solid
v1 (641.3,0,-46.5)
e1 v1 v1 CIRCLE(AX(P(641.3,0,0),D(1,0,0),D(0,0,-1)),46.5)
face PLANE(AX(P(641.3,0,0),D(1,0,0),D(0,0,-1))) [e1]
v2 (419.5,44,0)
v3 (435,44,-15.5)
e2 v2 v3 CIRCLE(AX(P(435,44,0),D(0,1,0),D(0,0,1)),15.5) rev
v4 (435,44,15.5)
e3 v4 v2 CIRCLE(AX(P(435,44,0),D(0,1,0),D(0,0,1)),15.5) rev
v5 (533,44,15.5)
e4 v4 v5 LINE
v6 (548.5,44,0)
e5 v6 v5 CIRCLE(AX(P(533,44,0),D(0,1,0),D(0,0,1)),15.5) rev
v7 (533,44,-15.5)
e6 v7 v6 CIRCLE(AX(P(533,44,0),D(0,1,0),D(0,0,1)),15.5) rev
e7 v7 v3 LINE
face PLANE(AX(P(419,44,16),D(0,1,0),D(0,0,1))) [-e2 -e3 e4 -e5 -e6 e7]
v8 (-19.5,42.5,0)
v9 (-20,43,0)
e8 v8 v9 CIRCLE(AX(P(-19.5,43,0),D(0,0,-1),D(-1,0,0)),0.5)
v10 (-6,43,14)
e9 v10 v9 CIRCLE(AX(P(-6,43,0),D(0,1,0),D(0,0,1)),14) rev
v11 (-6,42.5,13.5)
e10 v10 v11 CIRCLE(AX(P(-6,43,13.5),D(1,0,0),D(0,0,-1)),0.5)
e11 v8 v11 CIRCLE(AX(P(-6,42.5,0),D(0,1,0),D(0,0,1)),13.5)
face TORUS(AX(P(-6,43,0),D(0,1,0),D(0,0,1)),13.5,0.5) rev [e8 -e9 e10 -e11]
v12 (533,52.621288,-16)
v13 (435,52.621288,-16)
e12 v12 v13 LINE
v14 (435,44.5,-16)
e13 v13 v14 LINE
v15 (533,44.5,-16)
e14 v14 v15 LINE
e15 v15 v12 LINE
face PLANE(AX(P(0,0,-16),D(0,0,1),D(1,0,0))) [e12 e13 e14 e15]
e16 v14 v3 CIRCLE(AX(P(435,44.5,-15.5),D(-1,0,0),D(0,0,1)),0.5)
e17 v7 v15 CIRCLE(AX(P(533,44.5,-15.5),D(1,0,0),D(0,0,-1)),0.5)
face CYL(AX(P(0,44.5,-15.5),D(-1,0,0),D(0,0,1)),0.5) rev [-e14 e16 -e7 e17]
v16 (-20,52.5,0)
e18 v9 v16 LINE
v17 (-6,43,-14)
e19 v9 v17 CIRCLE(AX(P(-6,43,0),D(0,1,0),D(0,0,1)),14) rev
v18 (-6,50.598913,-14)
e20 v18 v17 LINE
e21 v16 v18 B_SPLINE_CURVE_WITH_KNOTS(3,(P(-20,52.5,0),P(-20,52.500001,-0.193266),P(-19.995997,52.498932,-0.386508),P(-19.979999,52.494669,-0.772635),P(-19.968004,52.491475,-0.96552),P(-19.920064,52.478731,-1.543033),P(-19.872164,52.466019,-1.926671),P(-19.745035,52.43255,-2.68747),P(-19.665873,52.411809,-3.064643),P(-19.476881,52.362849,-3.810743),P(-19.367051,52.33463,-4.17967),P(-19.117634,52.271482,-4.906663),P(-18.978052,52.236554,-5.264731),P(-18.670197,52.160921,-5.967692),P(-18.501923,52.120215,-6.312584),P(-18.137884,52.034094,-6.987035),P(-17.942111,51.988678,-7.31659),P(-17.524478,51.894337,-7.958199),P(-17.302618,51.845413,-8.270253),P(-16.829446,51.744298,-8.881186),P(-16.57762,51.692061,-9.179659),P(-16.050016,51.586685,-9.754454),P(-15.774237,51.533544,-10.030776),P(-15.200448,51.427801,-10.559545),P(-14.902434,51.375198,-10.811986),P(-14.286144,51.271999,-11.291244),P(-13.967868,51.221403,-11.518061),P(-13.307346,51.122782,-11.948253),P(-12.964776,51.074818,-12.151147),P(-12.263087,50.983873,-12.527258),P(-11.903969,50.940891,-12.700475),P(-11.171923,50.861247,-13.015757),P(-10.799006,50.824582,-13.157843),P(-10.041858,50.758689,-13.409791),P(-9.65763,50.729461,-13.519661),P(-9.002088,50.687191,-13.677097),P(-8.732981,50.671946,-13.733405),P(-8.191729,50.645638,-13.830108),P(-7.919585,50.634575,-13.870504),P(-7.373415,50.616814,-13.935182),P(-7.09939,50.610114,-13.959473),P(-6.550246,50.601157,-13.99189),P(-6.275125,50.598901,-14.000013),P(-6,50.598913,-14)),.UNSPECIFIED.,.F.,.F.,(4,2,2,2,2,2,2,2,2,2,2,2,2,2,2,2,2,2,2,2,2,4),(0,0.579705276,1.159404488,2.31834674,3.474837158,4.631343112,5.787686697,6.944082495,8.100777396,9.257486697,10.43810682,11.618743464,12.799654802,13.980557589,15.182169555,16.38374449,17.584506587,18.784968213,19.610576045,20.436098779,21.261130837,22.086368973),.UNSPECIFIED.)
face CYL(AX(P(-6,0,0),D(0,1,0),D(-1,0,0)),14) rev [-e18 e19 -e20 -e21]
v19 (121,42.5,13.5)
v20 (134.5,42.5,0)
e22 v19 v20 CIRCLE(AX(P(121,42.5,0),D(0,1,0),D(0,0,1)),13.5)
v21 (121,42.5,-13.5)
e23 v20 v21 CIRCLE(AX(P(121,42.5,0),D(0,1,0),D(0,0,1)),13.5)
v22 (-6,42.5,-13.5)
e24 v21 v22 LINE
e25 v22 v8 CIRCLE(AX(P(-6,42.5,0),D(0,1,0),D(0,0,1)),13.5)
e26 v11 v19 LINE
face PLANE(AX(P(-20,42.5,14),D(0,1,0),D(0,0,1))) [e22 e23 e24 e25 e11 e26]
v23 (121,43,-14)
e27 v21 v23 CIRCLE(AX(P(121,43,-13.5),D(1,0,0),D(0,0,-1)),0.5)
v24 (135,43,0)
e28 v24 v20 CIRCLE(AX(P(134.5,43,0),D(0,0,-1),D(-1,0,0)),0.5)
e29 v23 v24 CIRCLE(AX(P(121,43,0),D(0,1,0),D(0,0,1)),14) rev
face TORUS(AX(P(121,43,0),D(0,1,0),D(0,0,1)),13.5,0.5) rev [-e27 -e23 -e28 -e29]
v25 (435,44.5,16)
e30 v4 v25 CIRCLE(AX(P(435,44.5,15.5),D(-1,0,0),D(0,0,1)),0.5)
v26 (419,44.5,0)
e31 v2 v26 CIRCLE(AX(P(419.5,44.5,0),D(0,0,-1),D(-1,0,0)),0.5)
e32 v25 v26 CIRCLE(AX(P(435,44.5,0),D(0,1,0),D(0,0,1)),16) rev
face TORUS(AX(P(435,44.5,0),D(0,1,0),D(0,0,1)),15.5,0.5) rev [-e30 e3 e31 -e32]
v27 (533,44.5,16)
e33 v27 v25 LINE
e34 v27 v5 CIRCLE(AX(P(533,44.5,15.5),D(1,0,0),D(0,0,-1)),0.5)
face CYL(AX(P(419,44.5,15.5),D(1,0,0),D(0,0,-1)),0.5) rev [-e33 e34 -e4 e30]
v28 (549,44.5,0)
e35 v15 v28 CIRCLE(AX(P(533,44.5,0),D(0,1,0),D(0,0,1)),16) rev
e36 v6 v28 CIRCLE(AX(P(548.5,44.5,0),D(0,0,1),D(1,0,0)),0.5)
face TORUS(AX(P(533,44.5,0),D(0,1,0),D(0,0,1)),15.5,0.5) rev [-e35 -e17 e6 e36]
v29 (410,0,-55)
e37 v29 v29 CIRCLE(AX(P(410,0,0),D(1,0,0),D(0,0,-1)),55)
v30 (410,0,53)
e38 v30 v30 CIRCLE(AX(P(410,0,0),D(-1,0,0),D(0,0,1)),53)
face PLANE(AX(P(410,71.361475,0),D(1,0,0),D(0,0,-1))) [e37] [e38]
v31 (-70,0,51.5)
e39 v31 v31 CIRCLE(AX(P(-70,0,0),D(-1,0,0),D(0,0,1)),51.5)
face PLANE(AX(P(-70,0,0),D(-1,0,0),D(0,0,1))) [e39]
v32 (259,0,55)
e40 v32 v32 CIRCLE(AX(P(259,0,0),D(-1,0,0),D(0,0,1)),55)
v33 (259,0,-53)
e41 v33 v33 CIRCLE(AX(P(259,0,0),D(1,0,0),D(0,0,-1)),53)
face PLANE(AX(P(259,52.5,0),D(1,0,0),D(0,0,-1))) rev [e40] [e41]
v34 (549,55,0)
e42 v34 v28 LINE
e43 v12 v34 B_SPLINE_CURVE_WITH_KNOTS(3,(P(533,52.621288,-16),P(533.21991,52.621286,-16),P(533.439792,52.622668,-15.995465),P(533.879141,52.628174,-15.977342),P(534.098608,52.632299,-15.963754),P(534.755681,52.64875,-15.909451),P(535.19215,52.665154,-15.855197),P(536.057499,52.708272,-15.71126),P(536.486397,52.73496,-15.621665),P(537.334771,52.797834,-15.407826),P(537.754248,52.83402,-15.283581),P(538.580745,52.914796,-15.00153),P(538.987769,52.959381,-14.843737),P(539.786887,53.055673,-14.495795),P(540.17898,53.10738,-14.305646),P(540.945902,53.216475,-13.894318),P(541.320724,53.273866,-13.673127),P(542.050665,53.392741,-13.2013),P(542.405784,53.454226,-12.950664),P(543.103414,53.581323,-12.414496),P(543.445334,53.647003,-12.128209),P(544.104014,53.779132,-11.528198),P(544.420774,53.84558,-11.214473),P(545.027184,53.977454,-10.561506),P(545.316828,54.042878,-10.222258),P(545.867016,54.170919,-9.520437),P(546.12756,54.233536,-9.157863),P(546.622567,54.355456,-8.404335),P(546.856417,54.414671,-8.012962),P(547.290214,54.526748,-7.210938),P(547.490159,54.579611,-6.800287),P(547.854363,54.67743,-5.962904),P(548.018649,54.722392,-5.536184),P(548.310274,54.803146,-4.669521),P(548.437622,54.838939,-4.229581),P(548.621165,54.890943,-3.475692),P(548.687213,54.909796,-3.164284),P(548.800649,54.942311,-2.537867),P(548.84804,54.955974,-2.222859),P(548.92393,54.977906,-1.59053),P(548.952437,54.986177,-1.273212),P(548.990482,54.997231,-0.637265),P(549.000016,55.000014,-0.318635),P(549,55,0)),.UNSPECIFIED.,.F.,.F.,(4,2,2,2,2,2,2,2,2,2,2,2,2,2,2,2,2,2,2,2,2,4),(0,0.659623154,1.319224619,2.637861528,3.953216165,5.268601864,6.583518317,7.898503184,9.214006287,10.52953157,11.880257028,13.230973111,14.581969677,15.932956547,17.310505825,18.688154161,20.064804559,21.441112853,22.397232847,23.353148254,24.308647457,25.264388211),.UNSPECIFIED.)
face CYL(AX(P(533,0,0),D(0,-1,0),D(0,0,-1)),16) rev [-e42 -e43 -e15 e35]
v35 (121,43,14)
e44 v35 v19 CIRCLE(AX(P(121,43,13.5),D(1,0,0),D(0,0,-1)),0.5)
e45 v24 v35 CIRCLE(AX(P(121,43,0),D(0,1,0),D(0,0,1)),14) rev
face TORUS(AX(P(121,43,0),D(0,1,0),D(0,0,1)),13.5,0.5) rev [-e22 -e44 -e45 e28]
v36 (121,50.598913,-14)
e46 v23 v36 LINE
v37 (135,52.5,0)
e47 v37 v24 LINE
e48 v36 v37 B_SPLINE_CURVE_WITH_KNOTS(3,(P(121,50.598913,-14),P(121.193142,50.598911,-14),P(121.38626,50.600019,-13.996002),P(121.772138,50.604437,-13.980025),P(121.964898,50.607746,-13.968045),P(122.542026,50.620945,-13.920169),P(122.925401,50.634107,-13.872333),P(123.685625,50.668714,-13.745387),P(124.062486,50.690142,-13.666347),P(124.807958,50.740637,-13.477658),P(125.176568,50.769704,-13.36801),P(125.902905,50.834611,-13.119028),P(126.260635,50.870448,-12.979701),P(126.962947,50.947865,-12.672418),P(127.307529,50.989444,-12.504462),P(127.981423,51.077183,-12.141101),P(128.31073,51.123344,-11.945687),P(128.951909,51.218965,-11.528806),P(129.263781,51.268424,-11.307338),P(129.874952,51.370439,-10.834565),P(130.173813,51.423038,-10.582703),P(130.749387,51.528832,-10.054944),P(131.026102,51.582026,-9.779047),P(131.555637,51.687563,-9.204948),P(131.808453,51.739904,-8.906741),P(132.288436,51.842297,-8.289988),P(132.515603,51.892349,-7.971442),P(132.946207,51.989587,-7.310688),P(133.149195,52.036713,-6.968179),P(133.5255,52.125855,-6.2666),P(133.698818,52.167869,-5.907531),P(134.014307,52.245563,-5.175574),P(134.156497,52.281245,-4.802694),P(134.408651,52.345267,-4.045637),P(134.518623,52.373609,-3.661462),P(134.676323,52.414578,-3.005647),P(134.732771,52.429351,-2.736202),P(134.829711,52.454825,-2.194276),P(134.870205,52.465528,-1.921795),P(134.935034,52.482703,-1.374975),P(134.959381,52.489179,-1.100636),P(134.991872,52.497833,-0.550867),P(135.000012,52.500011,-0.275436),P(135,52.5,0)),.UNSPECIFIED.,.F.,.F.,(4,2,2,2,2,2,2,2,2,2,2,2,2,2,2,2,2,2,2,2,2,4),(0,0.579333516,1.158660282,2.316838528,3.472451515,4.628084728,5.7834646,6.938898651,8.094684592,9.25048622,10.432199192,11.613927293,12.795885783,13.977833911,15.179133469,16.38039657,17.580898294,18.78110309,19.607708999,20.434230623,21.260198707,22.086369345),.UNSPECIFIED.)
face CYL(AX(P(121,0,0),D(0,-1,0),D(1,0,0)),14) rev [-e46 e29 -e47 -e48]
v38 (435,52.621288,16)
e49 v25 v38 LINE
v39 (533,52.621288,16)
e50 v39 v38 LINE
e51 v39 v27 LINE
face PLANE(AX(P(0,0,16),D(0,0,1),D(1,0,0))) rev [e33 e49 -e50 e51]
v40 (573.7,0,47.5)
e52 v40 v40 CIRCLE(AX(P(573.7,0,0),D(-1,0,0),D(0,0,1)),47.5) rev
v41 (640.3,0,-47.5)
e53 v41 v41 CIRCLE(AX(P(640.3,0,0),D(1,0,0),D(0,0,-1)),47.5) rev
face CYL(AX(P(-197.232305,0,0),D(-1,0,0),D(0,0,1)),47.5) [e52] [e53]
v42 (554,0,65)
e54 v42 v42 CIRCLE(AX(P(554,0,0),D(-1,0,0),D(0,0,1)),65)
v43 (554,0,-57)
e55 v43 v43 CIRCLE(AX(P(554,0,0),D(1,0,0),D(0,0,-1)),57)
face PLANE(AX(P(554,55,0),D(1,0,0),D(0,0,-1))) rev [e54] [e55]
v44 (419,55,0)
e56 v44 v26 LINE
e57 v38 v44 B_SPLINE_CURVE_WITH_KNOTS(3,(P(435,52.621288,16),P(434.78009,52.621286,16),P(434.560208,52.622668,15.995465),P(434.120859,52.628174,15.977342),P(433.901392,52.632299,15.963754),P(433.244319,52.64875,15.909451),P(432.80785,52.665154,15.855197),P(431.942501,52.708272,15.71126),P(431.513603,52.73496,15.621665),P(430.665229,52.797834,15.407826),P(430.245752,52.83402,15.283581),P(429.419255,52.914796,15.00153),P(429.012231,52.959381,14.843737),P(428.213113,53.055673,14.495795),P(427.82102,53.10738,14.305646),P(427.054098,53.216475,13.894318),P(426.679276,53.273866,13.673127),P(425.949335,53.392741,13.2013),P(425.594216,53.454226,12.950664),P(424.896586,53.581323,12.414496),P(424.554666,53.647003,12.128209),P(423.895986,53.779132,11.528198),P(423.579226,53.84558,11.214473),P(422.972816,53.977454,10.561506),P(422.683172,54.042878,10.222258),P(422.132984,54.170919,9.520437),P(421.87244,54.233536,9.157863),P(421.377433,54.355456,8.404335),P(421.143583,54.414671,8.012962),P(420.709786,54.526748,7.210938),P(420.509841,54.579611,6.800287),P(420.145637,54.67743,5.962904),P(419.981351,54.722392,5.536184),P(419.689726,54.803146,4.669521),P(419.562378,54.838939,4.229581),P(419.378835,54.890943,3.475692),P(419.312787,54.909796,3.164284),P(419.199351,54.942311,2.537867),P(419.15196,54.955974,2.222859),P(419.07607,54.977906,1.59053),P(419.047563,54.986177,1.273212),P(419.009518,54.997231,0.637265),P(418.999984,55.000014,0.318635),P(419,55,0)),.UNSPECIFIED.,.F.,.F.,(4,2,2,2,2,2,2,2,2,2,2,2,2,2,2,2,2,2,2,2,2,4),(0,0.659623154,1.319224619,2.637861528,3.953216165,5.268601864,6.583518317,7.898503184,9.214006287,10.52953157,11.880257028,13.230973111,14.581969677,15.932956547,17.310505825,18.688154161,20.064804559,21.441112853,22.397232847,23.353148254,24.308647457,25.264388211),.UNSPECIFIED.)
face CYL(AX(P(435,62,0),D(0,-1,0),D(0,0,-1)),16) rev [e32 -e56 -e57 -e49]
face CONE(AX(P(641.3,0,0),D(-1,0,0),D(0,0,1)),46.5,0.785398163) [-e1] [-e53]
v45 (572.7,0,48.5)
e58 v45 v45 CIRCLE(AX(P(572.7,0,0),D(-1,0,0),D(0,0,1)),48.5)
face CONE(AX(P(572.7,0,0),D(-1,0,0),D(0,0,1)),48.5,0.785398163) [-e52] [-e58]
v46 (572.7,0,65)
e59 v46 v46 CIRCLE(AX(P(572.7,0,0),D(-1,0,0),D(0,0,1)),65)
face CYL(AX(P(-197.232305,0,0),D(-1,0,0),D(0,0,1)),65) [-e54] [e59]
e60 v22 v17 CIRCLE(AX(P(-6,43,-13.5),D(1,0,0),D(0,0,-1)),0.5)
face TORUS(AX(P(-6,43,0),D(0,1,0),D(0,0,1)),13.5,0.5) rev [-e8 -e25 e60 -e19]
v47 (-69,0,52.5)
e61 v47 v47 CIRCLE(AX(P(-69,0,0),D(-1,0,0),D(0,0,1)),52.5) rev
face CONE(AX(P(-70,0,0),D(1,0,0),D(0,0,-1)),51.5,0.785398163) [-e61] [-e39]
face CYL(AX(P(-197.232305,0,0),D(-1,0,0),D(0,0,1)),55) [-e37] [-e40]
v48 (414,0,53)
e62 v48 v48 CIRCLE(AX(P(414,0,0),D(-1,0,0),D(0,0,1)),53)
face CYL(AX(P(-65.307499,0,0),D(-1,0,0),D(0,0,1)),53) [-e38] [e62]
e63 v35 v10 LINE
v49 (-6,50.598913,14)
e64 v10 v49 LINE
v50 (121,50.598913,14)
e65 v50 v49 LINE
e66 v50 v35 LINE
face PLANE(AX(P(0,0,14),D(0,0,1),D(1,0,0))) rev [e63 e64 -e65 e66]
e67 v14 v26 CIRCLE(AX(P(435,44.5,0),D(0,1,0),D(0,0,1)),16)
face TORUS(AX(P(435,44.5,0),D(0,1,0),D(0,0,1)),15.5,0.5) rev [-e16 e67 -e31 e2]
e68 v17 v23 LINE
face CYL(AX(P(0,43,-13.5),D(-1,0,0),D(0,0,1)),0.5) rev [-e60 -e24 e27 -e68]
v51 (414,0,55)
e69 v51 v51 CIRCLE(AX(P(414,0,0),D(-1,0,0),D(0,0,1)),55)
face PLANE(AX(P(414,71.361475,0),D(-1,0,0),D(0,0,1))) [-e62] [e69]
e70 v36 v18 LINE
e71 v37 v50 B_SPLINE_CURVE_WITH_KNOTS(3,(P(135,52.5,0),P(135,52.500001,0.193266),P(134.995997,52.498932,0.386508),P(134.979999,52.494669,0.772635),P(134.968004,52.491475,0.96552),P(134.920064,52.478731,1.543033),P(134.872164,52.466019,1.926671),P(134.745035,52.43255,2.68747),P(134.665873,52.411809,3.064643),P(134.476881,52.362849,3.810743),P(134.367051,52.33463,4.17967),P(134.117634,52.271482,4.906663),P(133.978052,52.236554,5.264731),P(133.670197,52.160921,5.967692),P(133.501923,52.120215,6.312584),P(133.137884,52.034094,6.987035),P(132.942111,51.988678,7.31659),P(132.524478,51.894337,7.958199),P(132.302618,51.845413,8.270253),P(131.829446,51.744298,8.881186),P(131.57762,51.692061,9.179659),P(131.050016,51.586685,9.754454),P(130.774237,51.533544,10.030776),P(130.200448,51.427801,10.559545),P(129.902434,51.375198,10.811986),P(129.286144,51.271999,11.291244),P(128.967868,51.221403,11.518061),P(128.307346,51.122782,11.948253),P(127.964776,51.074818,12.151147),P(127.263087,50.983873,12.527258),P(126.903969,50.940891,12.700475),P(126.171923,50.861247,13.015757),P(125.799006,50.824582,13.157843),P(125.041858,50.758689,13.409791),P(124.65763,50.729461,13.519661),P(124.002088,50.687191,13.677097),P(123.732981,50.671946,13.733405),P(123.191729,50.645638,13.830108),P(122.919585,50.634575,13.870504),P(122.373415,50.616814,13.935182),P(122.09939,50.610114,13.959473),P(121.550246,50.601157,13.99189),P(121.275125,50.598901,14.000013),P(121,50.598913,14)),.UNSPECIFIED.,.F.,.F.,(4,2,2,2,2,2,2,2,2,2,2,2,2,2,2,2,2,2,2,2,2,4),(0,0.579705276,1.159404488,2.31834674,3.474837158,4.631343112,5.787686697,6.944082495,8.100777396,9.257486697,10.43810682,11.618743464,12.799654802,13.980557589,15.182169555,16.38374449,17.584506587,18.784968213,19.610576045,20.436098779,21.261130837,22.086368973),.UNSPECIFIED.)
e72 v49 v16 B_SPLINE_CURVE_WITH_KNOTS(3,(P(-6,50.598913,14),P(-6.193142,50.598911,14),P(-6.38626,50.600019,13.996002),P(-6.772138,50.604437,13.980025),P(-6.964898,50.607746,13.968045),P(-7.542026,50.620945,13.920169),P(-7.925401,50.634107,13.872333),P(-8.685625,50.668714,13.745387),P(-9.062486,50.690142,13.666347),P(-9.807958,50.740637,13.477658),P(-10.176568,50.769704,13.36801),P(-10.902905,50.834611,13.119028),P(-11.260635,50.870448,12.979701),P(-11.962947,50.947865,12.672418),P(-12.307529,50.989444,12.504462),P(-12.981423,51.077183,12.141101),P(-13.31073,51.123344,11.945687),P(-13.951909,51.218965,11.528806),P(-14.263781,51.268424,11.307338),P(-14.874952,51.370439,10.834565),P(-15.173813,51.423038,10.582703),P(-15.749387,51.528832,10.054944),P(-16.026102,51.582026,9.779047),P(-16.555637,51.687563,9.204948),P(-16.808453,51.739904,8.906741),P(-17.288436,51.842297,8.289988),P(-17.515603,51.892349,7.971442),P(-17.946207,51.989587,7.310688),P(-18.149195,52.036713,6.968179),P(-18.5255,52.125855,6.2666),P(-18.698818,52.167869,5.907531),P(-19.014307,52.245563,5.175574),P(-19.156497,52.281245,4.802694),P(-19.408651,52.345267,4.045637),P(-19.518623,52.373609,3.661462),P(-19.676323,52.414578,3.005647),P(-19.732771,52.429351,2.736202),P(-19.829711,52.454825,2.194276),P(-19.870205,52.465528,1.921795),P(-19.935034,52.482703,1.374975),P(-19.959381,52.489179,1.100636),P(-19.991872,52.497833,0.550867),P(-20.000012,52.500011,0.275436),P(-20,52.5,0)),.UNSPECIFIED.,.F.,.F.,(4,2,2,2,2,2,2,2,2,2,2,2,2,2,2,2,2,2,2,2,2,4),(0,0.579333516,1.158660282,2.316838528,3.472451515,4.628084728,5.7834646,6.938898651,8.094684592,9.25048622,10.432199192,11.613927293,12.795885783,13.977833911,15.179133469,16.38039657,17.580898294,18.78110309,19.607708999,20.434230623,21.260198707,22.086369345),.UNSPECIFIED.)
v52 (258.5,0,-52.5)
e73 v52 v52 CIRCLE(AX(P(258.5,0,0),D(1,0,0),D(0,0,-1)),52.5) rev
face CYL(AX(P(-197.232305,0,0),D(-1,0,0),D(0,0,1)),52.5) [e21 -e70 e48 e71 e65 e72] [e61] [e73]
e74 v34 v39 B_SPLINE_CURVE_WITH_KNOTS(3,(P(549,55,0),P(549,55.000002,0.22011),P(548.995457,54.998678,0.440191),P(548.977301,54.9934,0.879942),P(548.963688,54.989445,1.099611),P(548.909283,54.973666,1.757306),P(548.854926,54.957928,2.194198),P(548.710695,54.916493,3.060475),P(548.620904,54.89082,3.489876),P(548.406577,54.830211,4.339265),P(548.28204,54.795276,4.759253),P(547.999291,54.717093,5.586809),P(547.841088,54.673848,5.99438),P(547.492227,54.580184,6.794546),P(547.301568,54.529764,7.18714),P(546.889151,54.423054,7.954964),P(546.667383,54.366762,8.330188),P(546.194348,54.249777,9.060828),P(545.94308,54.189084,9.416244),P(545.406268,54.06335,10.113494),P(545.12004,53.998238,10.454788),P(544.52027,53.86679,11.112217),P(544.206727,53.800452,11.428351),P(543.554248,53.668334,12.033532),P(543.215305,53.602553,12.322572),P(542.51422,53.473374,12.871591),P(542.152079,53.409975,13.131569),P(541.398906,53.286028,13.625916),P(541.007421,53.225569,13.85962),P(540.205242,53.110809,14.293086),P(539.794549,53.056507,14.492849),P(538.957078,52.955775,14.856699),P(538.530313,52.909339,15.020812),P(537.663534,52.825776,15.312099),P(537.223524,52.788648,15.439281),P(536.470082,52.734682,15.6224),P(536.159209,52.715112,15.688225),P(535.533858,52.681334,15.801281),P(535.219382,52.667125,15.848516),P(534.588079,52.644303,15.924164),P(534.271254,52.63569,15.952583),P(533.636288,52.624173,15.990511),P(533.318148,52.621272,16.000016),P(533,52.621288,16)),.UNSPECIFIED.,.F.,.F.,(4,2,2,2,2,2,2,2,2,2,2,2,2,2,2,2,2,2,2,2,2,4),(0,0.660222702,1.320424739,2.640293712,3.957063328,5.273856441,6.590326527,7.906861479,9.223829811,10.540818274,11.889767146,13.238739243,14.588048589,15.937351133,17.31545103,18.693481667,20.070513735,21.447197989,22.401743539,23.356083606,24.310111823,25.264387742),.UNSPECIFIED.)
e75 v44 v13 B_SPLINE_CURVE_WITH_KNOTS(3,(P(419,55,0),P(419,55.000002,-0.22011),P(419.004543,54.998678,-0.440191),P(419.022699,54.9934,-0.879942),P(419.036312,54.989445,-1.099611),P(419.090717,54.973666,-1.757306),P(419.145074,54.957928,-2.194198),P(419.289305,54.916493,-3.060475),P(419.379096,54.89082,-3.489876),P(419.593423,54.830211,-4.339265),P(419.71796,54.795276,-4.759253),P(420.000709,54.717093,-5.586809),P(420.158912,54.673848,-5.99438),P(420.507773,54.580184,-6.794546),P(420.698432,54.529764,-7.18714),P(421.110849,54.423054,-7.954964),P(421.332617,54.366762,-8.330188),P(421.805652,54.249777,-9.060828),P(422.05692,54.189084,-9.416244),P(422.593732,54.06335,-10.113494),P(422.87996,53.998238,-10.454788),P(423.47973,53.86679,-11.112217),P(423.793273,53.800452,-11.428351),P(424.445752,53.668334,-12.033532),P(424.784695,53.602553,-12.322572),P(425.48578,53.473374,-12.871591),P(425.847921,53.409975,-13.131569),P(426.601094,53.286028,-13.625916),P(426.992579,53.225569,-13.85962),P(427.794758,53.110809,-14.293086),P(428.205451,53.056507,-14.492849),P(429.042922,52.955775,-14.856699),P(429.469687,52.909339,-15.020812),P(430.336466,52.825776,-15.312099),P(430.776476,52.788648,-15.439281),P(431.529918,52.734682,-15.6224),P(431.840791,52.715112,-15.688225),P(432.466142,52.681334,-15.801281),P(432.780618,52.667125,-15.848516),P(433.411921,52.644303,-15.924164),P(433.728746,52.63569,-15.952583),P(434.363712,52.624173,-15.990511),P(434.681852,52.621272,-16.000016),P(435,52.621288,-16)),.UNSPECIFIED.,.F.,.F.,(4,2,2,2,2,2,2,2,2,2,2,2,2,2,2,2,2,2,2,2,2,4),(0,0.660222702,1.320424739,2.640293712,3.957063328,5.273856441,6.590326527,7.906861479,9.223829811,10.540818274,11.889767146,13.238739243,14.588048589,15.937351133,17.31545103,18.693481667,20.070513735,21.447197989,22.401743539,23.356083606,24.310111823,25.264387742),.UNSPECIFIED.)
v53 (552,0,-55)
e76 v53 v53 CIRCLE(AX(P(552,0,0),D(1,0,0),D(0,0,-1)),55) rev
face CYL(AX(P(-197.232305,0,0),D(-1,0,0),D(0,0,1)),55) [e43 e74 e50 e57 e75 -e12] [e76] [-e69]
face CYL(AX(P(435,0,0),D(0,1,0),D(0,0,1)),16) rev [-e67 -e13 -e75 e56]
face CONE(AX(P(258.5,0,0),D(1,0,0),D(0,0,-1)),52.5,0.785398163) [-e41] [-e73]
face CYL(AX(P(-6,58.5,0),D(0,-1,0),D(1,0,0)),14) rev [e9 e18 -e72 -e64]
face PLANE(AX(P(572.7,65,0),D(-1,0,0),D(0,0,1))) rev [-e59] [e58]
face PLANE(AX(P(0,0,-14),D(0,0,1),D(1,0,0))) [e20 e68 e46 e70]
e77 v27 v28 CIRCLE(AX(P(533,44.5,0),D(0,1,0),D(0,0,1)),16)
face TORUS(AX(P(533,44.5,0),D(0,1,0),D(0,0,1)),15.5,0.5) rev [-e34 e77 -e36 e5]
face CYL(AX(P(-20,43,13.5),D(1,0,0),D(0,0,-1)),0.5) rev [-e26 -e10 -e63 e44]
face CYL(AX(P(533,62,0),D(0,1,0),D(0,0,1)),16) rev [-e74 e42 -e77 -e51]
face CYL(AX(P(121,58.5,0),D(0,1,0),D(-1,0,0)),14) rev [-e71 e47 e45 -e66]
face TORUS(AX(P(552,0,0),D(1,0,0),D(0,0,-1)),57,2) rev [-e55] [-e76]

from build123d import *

# Parameters (mm, degrees)
SMUSSO1_SIZE                  = 0.5
SMUSSO2_SIZE                  = 1
TAGLIO_ESTRUSIONE1_DEPTH      = 16
TAGLIO_ESTRUSIONE1_DEPTH_BACK = 16
SCHIZZO2_W                    = 130
SCHIZZO2_H                    = 18
RACCORDO1_R                   = 0.5
RACCORDO2_R                   = 16
RACCORDO3_R                   = 2
SCHIZZO3_W                    = 4
SCHIZZO3_H                    = 18.361474643
SCHIZZO6_R                    = 52.5
ESTRUSIONE_ESTRUSIONE1_DEPTH  = 70
TAGLIO_ESTRUSIONE2_DEPTH      = 14
TAGLIO_ESTRUSIONE2_DEPTH_BACK = 14
SCHIZZO4_W                    = 155
SCHIZZO4_H                    = 16
RACCORDO4_R                   = 14
RACCORDO5_R                   = 0.5
ESTRUSIONE_ESTRUSIONE2_START  = 13
SCHIZZO7_R                    = 47.5
ESTRUSIONE_ESTRUSIONE2_DEPTH  = 13
SMUSSO3_SIZE                  = 1


with BuildPart() as part:
    # Schizzo1 → Rivoluzione1 (revolve)
    with BuildSketch(Plane.XY, mode=Mode.PRIVATE) as rivoluzione1_sk:
        Polygon((0, 0), (0, 52.5), (259, 52.5), (259, 55), (554, 55), (554, 65), (572.7, 65), (572.7, 47.5), (628.3, 47.5), (628.3, 0), align=None)
    revolve(rivoluzione1_sk.sketch.rotate(Axis((-197.2323049, 0, 0), (1, 0, 0)), 90), axis=Axis((-197.2323049, 0, 0), (1, 0, 0)))

    # Smusso1
    smusso1_edges = [part.edges().sort_by_distance(p)[0] for p in [
        (259, 0, -52.5),
    ]]
    chamfer(smusso1_edges, length=SMUSSO1_SIZE)

    # Smusso2
    smusso2_edges = [part.edges().sort_by_distance(p)[0] for p in [
        (572.7, 0, -47.5),
    ]]
    chamfer(smusso2_edges, length=SMUSSO2_SIZE)

    # Schizzo2 → Taglio-Estrusione1 (cut, two sides: drawn at the far end of the back side and taken through both)
    with BuildSketch(Plane.XY.offset(-TAGLIO_ESTRUSIONE1_DEPTH_BACK)):
        with Locations((484, 53)):
            Rectangle(SCHIZZO2_W, SCHIZZO2_H)
    extrude(amount=TAGLIO_ESTRUSIONE1_DEPTH + TAGLIO_ESTRUSIONE1_DEPTH_BACK, mode=Mode.SUBTRACT)

    # Raccordo1
    raccordo1_edges = [part.edges().sort_by_distance(p)[0] for p in [
        (549, 44, 0),
        (484, 44, 16),
        (419, 44, 0),
        (484, 44, -16),
    ]]
    fillet(raccordo1_edges, radius=RACCORDO1_R)

    # Raccordo2
    # the kernel refuses this fillet: 16 mm, written as the material it adds along each edge
    with BuildSketch(Plane(origin=(533, 44, 0), x_dir=(1, 0, 0), z_dir=(0, 0, -1))) as raccordo2_piece_1:
        with BuildLine():
            CenterArc((15.5, -0.5), 0.5, 0, 90)
            Line((16, -0.5), (16, 0))
            Line((16, 0), (15.5, 0))
        make_face()
    revolve(axis=Axis((533, 44, 0), (0, -1, 0)), revolution_arc=90)
    with BuildSketch(Plane(origin=(435, 44, 0), x_dir=(-1, 0, 0), z_dir=(0, 0, 1))) as raccordo2_piece_2:
        with BuildLine():
            CenterArc((15.5, -0.5), 0.5, 0, 90)
            Line((16, -0.5), (16, 0))
            Line((16, 0), (15.5, 0))
        make_face()
    revolve(axis=Axis((435, 44, 0), (0, -1, 0)), revolution_arc=90)
    with BuildSketch(Plane(origin=(435, 44, 0), x_dir=(0, 0, 1), z_dir=(1, 0, 0))) as raccordo2_piece_3:
        with BuildLine():
            CenterArc((15.5, -0.5), 0.5, 0, 90)
            Line((16, -0.5), (16, 0))
            Line((16, 0), (15.5, 0))
        make_face()
    revolve(axis=Axis((435, 44, 0), (0, -1, 0)), revolution_arc=90)
    with BuildSketch(Plane(origin=(533, 44, 0), x_dir=(0, 0, -1), z_dir=(-1, 0, 0))) as raccordo2_piece_4:
        with BuildLine():
            CenterArc((15.5, -0.5), 0.5, 0, 90)
            Line((16, -0.5), (16, 0))
            Line((16, 0), (15.5, 0))
        make_face()
    revolve(axis=Axis((533, 44, 0), (0, -1, 0)), revolution_arc=90)
    with BuildSketch(Plane(origin=(549, 92.621288468, -16), x_dir=(-1, 0, 0), z_dir=(0, -1, 0))) as raccordo2_piece_5_section:
        with BuildLine():
            CenterArc((RACCORDO2_R, -RACCORDO2_R), RACCORDO2_R, 90, 90)
            Line((0, -RACCORDO2_R), (0, 0))
            Line((0, 0), (RACCORDO2_R, 0))
        make_face()
    raccordo2_piece_5 = extrude(amount=48.621288468, mode=Mode.PRIVATE)
    raccordo2_piece_5 = raccordo2_piece_5 & Plane(origin=(545.534076623, 0, 0), x_dir=(0, 0, 1), z_dir=(1, 0, 0)) * Cylinder(55, 162, mode=Mode.PRIVATE)
    add(raccordo2_piece_5)
    with BuildSketch(Plane(origin=(419, 44, 16), x_dir=(0, 0, -1), z_dir=(0, 1, 0))) as raccordo2_piece_6_section:
        with BuildLine():
            CenterArc((RACCORDO2_R, -RACCORDO2_R), RACCORDO2_R, 90, 90)
            Line((0, -RACCORDO2_R), (0, 0))
            Line((0, 0), (RACCORDO2_R, 0))
        make_face()
    raccordo2_piece_6 = extrude(amount=48.621288468, mode=Mode.PRIVATE)
    raccordo2_piece_6 = raccordo2_piece_6 & Plane(origin=(422.465920441, 0, 0), x_dir=(0, 0, 1), z_dir=(1, 0, 0)) * Cylinder(55, 162, mode=Mode.PRIVATE)
    add(raccordo2_piece_6)
    with BuildSketch(Plane(origin=(419, 44, -16), x_dir=(0, 0, 1), z_dir=(0, 1, 0))) as raccordo2_piece_7_section:
        with BuildLine():
            CenterArc((RACCORDO2_R, RACCORDO2_R), RACCORDO2_R, 180, 90)
            Line((0, RACCORDO2_R), (0, 0))
            Line((0, 0), (RACCORDO2_R, 0))
        make_face()
    raccordo2_piece_7 = extrude(amount=48.621288468, mode=Mode.PRIVATE)
    raccordo2_piece_7 = raccordo2_piece_7 & Plane(origin=(422.465924893, 0, 0), x_dir=(0, 0, 1), z_dir=(1, 0, 0)) * Cylinder(55, 162, mode=Mode.PRIVATE)
    add(raccordo2_piece_7)
    with BuildSketch(Plane(origin=(549, 92.621288468, 16), x_dir=(-1, 0, 0), z_dir=(0, -1, 0))) as raccordo2_piece_8_section:
        with BuildLine():
            CenterArc((RACCORDO2_R, RACCORDO2_R), RACCORDO2_R, 180, 90)
            Line((0, RACCORDO2_R), (0, 0))
            Line((0, 0), (RACCORDO2_R, 0))
        make_face()
    raccordo2_piece_8 = extrude(amount=48.621288468, mode=Mode.PRIVATE)
    raccordo2_piece_8 = raccordo2_piece_8 & Plane(origin=(545.534073929, 0, 0), x_dir=(0, 0, 1), z_dir=(1, 0, 0)) * Cylinder(55, 162, mode=Mode.PRIVATE)
    add(raccordo2_piece_8)

    # Raccordo3
    raccordo3_edges = [part.edges().sort_by_distance(p)[0] for p in [
        (554, 0, -55),
    ]]
    fillet(raccordo3_edges, radius=RACCORDO3_R)

    # Schizzo3 → Taglia-Rivoluzione1 (revolve, cut)
    with BuildSketch(Plane.XY, mode=Mode.PRIVATE) as taglia_rivoluzione1_sk:
        with Locations((412, 62.180737322)):
            Rectangle(SCHIZZO3_W, SCHIZZO3_H)
    revolve(taglia_rivoluzione1_sk.sketch.rotate(Axis((-65.307499475, 0, 0), (1, 0, 0)), 90), axis=Axis((-65.307499475, 0, 0), (1, 0, 0)), mode=Mode.SUBTRACT)

    # Schizzo6 → Estrusione-Estrusione1 (add)
    with BuildSketch(Plane.ZY):
        Circle(SCHIZZO6_R)
    extrude(amount=ESTRUSIONE_ESTRUSIONE1_DEPTH)

    # Schizzo4 → Taglio-Estrusione2 (cut, two sides: drawn at the far end of the back side and taken through both)
    with BuildSketch(Plane.XY.offset(-TAGLIO_ESTRUSIONE2_DEPTH_BACK)):
        with Locations((57.5, 50.5)):
            Rectangle(SCHIZZO4_W, SCHIZZO4_H)
    extrude(amount=TAGLIO_ESTRUSIONE2_DEPTH + TAGLIO_ESTRUSIONE2_DEPTH_BACK, mode=Mode.SUBTRACT)

    # Raccordo4
    # the kernel refuses this fillet: 14 mm, written as the material it adds along each edge
    with BuildSketch(Plane(origin=(135, 85.598913032, 14), x_dir=(-1, 0, 0), z_dir=(0, -1, 0))) as raccordo4_piece_1_section:
        with BuildLine():
            CenterArc((RACCORDO4_R, RACCORDO4_R), RACCORDO4_R, 180, 90)
            Line((0, RACCORDO4_R), (0, 0))
            Line((0, 0), (RACCORDO4_R, 0))
        make_face()
    raccordo4_piece_1 = extrude(amount=78.098913032, mode=Mode.PRIVATE)
    raccordo4_piece_1 = raccordo4_piece_1 & Plane(origin=(131.948408204, 0, 0), x_dir=(0, 0, 1), z_dir=(1, 0, 0)) * Cylinder(52.5, 213, mode=Mode.PRIVATE)
    add(raccordo4_piece_1)
    with BuildSketch(Plane(origin=(135, 85.598913032, -14), x_dir=(0, 0, 1), z_dir=(0, -1, 0))) as raccordo4_piece_2_section:
        with BuildLine():
            CenterArc((RACCORDO4_R, RACCORDO4_R), RACCORDO4_R, 180, 90)
            Line((0, RACCORDO4_R), (0, 0))
            Line((0, 0), (RACCORDO4_R, 0))
        make_face()
    raccordo4_piece_2 = extrude(amount=78.098913032, mode=Mode.PRIVATE)
    raccordo4_piece_2 = raccordo4_piece_2 & Plane(origin=(131.948403613, 0, 0), x_dir=(0, 0, 1), z_dir=(1, 0, 0)) * Cylinder(52.5, 213, mode=Mode.PRIVATE)
    add(raccordo4_piece_2)
    with BuildSketch(Plane(origin=(-20, 7.5, 14), x_dir=(0, 0, -1), z_dir=(0, 1, 0))) as raccordo4_piece_3_section:
        with BuildLine():
            CenterArc((RACCORDO4_R, -RACCORDO4_R), RACCORDO4_R, 90, 90)
            Line((0, -RACCORDO4_R), (0, 0))
            Line((0, 0), (RACCORDO4_R, 0))
        make_face()
    raccordo4_piece_3 = extrude(amount=78.098913032, mode=Mode.PRIVATE)
    raccordo4_piece_3 = raccordo4_piece_3 & Plane(origin=(-16.8304684, 0, 0), x_dir=(0, 0, 1), z_dir=(1, 0, 0)) * Cylinder(52.5, 213, mode=Mode.PRIVATE)
    add(raccordo4_piece_3)
    with BuildSketch(Plane(origin=(-20, 7.5, -14), x_dir=(0, 0, 1), z_dir=(0, 1, 0))) as raccordo4_piece_4_section:
        with BuildLine():
            CenterArc((RACCORDO4_R, RACCORDO4_R), RACCORDO4_R, 180, 90)
            Line((0, RACCORDO4_R), (0, 0))
            Line((0, 0), (RACCORDO4_R, 0))
        make_face()
    raccordo4_piece_4 = extrude(amount=78.098913032, mode=Mode.PRIVATE)
    raccordo4_piece_4 = raccordo4_piece_4 & Plane(origin=(-16.8304684, 0, 0), x_dir=(0, 0, 1), z_dir=(1, 0, 0)) * Cylinder(52.5, 213, mode=Mode.PRIVATE)
    add(raccordo4_piece_4)

    # Raccordo5
    raccordo5_edges = [part.edges().sort_by_distance(p)[0] for p in [
        (57.5, 42.5, 14),
        (57.5, 42.5, -14),
        (-20, 42.5, 0),
        (-20, 42.5, 0),
        (135, 42.5, 0),
        (135, 42.5, 0),
    ]]
    fillet(raccordo5_edges, radius=RACCORDO5_R)

    # Schizzo7 → Estrusione-Estrusione2 (add)
    with BuildSketch(Plane(origin=(628.3, 0, 0), x_dir=(0, 0, -1), z_dir=(1, 0, 0)).offset(ESTRUSIONE_ESTRUSIONE2_START)):
        with Locations(Location((0, 0, 0), (0, 0, 180))):
            Circle(SCHIZZO7_R)
    extrude(amount=-ESTRUSIONE_ESTRUSIONE2_DEPTH)

    # Smusso3
    smusso3_edges = [part.edges().sort_by_distance(p)[0] for p in [
        (-70, 0, -52.5),
        (641.3, 0, -47.5),
    ]]
    chamfer(smusso3_edges, length=SMUSSO3_SIZE)


solid = part.part
